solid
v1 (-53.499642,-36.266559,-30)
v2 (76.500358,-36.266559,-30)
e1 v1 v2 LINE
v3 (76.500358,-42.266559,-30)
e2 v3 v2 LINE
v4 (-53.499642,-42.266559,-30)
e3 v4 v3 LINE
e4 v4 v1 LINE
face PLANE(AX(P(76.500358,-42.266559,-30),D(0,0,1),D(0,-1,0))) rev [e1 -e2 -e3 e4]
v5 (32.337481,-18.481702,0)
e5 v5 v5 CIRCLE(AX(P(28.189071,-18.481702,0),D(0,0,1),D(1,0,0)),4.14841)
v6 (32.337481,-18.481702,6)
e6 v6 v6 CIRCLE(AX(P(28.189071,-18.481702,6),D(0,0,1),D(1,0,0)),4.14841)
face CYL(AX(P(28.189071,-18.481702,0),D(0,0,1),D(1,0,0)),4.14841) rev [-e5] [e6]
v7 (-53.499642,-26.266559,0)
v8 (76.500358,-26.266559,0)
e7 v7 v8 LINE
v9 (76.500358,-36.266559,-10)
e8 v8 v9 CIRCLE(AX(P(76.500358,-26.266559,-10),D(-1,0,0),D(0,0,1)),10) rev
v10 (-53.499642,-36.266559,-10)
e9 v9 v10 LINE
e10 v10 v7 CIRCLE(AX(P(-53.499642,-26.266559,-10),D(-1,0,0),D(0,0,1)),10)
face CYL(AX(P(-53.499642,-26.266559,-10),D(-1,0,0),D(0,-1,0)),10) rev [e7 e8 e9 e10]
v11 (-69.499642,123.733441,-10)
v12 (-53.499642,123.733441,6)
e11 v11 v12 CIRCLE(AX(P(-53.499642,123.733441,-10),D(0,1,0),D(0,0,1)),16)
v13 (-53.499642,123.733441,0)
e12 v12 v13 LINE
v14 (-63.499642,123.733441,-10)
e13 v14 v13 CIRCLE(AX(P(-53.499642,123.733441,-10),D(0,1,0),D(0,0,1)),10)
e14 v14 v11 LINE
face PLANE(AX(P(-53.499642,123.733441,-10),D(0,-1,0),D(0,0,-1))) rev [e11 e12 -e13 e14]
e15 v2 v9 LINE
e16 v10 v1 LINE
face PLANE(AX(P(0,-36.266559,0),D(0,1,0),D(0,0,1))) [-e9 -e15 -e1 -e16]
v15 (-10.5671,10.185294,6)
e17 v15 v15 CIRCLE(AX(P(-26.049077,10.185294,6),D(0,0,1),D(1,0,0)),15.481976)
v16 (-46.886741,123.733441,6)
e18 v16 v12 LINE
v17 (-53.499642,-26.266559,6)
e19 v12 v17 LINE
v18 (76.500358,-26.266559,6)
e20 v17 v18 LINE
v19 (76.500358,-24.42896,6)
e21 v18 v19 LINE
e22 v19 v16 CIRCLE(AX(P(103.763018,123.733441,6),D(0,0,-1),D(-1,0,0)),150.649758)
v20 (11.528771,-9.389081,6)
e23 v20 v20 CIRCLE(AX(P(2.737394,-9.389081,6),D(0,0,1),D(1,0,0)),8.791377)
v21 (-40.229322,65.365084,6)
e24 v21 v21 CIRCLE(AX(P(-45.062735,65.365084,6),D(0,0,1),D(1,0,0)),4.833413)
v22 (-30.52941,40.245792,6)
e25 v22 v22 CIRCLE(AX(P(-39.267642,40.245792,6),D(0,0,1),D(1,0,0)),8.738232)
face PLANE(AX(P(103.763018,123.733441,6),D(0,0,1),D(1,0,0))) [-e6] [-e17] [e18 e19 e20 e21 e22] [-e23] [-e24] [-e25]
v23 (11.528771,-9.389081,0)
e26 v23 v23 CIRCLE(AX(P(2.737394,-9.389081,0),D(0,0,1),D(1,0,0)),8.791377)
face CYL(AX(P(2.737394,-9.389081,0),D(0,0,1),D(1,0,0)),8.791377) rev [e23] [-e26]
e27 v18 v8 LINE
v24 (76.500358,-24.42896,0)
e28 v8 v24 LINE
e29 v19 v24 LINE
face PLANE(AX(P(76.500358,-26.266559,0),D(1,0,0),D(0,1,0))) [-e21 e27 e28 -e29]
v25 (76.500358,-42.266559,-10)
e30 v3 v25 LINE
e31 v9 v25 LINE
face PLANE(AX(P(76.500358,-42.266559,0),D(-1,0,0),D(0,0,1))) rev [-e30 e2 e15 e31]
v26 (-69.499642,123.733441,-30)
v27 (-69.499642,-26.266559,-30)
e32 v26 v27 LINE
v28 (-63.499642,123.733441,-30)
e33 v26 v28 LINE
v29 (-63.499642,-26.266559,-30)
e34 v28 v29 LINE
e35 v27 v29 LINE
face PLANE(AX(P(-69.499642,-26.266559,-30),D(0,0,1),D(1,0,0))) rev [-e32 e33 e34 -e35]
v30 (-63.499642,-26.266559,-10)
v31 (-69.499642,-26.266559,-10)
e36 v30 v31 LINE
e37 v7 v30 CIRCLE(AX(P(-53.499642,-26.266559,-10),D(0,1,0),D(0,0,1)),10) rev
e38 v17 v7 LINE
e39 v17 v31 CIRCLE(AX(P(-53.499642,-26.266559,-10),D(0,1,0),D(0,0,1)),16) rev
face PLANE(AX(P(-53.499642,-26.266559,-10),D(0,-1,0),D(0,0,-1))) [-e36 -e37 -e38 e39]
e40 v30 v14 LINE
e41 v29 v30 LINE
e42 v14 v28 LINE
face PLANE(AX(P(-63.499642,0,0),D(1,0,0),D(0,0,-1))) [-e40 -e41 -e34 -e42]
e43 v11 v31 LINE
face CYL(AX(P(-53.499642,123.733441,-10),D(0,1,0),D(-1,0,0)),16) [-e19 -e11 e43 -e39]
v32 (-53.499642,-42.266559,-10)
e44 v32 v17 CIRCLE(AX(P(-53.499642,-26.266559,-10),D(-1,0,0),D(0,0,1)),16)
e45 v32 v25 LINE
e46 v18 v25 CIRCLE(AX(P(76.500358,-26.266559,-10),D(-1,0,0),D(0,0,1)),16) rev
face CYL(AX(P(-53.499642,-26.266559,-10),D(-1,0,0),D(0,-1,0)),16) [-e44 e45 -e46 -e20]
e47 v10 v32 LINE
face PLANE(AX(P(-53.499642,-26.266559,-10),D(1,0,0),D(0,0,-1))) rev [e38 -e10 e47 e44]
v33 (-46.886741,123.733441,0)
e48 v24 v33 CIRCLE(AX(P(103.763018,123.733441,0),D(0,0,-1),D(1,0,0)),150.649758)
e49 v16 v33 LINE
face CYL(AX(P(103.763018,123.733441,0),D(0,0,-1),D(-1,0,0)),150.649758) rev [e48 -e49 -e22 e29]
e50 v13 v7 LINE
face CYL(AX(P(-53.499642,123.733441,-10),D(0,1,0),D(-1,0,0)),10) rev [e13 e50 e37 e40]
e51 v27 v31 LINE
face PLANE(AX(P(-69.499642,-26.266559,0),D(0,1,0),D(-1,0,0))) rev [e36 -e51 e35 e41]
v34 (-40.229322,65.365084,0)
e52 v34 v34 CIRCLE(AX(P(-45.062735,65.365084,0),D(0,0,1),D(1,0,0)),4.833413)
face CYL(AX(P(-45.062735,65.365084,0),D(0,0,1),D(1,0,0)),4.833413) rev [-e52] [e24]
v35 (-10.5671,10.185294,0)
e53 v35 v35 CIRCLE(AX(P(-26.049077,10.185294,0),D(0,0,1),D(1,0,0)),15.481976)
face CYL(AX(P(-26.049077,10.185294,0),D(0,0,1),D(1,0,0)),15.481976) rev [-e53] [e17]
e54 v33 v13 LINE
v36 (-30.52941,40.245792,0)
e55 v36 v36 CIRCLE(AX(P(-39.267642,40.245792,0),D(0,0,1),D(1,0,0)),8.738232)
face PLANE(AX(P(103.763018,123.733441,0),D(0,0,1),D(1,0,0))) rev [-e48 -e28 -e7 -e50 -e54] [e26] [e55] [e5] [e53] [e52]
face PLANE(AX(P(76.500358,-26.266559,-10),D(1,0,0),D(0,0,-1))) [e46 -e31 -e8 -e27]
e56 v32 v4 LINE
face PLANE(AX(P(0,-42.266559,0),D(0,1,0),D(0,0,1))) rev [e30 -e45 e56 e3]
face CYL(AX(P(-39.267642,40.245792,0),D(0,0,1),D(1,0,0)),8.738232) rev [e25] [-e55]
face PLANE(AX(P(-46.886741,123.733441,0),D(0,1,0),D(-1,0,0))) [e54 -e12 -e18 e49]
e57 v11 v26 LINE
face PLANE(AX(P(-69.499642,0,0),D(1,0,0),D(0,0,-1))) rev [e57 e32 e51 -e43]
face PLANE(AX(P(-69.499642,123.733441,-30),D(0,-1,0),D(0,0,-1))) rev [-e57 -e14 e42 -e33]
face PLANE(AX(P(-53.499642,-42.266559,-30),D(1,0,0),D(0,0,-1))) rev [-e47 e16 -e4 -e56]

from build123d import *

# Parameters (mm, degrees)
SALIENTE_EXTRUIR1_DEPTH       = 3
CROQUIS2_R                    = 4.148409518
CROQUIS2_R_2                  = 8.791376577
CROQUIS2_R_3                  = 15.481976199
CROQUIS2_R_4                  = 8.738232185
CROQUIS2_R_5                  = 4.833412798
CORTAR_EXTRUIR1_DEPTH         = 3
CONVERTIR_S_LIDO1_START       = 3
CONVERTIR_S_LIDO1_OUTLINE_R   = 15.481976199
CONVERTIR_S_LIDO1_OUTLINE_R_2 = 8.791376577
CONVERTIR_S_LIDO1_OUTLINE_R_3 = 8.738232185
CONVERTIR_S_LIDO1_OUTLINE_R_4 = 4.148409518
CONVERTIR_S_LIDO1_OUTLINE_R_5 = 4.833412798
CONVERTIR_S_LIDO1_DEPTH       = 3
BRIDA_DE_ARISTA1_DEPTH        = 130
BRIDA_DE_ARISTA2_DEPTH        = 150


# Read off the part's stored shape, not the designer's step: Convertir-Sólido1
# Sheet-metal steps are written as plain solids
with BuildPart() as part:
    # Croquis1 → Saliente-Extruir1 (new body)
    with BuildSketch(Plane.XY):
        with BuildLine():
            Line((-53.499641927, 123.733441258), (-53.499641927, -26.266558742))
            Line((-53.499641927, -26.266558742), (76.500358073, -26.266558742))
            Line((76.500358073, -26.266558742), (76.500358073, -24.4289598))
            ThreePointArc((76.500358073, -24.4289598), (-12.000669933, 27.327433669), (-46.886740562, 123.733441258))
            Line((-46.886740562, 123.733441258), (-53.499641927, 123.733441258))
        make_face()
    extrude(amount=SALIENTE_EXTRUIR1_DEPTH)

    # Croquis2 → Cortar-Extruir1 (cut)
    with BuildSketch(Plane.XY.offset(3)):
        with Locations((28.189071336, -18.481702035)):
            Circle(CROQUIS2_R)
        with Locations((2.737394478, -9.389080565)):
            Circle(CROQUIS2_R_2)
        with Locations((-26.049076551, 10.185293851)):
            Circle(CROQUIS2_R_3)
        with Locations((-39.267642342, 40.245791579)):
            Circle(CROQUIS2_R_4)
        with Locations((-45.062734708, 65.365084268)):
            Circle(CROQUIS2_R_5)
    extrude(amount=-CORTAR_EXTRUIR1_DEPTH, mode=Mode.SUBTRACT)

    # Convertir-Sólido1 outline → Convertir-Sólido1 (add)
    with BuildSketch(Plane.XY.offset(CONVERTIR_S_LIDO1_START)):
        with BuildLine():
            Line((-53.499641927, -26.266558742), (76.500358073, -26.266558742))
            Line((76.500358073, -26.266558742), (76.500358073, -24.4289598))
            ThreePointArc((76.500358073, -24.4289598), (-12.000669933, 27.327433669), (-46.886740562, 123.733441258))
            Line((-46.886740562, 123.733441258), (-53.499641927, 123.733441258))
            Line((-53.499641927, 123.733441258), (-53.499641927, -26.266558742))
        make_face()
        with Locations((-26.049076551, 10.185293851)):
            Circle(CONVERTIR_S_LIDO1_OUTLINE_R, mode=Mode.SUBTRACT)
        with Locations((2.737394478, -9.389080565)):
            Circle(CONVERTIR_S_LIDO1_OUTLINE_R_2, mode=Mode.SUBTRACT)
        with Locations((-39.267642342, 40.245791579)):
            Circle(CONVERTIR_S_LIDO1_OUTLINE_R_3, mode=Mode.SUBTRACT)
        with Locations((28.189071336, -18.481702035)):
            Circle(CONVERTIR_S_LIDO1_OUTLINE_R_4, mode=Mode.SUBTRACT)
        with Locations((-45.062734708, 65.365084268)):
            Circle(CONVERTIR_S_LIDO1_OUTLINE_R_5, mode=Mode.SUBTRACT)
    extrude(amount=CONVERTIR_S_LIDO1_DEPTH)

    # Brida de arista1 section (across the edge) → Brida de arista1 (add)
    with BuildSketch(Plane(origin=(76.500358073, -36.266558742, 0), x_dir=(0, 1, 0), z_dir=(-1, 0, 0))):
        with BuildLine():
            Line((-6, 10), (-6, 30))
            Line((-6, 30), (0, 30))
            Line((0, 30), (0, 10))
            ThreePointArc((0, 10), (2.928932188, 2.928932188), (10, 0))
            Line((10, 0), (10, -6))
            ThreePointArc((10, -6), (-1.313708499, -1.313708499), (-6, 10))
        make_face()
    extrude(amount=BRIDA_DE_ARISTA1_DEPTH)

    # Brida de arista2 section (across the edge) → Brida de arista2 (add)
    with BuildSketch(Plane(origin=(-63.499641927, -26.266558742, 0), x_dir=(1, 0, 0), z_dir=(0, 1, 0))):
        with BuildLine():
            Line((-6, 10), (-6, 30))
            Line((-6, 30), (0, 30))
            Line((0, 30), (0, 10))
            ThreePointArc((0, 10), (2.928932188, 2.928932188), (10, 0))
            Line((10, 0), (10, -6))
            ThreePointArc((10, -6), (-1.313708499, -1.313708499), (-6, 10))
        make_face()
    extrude(amount=BRIDA_DE_ARISTA2_DEPTH)


solid = part.part
